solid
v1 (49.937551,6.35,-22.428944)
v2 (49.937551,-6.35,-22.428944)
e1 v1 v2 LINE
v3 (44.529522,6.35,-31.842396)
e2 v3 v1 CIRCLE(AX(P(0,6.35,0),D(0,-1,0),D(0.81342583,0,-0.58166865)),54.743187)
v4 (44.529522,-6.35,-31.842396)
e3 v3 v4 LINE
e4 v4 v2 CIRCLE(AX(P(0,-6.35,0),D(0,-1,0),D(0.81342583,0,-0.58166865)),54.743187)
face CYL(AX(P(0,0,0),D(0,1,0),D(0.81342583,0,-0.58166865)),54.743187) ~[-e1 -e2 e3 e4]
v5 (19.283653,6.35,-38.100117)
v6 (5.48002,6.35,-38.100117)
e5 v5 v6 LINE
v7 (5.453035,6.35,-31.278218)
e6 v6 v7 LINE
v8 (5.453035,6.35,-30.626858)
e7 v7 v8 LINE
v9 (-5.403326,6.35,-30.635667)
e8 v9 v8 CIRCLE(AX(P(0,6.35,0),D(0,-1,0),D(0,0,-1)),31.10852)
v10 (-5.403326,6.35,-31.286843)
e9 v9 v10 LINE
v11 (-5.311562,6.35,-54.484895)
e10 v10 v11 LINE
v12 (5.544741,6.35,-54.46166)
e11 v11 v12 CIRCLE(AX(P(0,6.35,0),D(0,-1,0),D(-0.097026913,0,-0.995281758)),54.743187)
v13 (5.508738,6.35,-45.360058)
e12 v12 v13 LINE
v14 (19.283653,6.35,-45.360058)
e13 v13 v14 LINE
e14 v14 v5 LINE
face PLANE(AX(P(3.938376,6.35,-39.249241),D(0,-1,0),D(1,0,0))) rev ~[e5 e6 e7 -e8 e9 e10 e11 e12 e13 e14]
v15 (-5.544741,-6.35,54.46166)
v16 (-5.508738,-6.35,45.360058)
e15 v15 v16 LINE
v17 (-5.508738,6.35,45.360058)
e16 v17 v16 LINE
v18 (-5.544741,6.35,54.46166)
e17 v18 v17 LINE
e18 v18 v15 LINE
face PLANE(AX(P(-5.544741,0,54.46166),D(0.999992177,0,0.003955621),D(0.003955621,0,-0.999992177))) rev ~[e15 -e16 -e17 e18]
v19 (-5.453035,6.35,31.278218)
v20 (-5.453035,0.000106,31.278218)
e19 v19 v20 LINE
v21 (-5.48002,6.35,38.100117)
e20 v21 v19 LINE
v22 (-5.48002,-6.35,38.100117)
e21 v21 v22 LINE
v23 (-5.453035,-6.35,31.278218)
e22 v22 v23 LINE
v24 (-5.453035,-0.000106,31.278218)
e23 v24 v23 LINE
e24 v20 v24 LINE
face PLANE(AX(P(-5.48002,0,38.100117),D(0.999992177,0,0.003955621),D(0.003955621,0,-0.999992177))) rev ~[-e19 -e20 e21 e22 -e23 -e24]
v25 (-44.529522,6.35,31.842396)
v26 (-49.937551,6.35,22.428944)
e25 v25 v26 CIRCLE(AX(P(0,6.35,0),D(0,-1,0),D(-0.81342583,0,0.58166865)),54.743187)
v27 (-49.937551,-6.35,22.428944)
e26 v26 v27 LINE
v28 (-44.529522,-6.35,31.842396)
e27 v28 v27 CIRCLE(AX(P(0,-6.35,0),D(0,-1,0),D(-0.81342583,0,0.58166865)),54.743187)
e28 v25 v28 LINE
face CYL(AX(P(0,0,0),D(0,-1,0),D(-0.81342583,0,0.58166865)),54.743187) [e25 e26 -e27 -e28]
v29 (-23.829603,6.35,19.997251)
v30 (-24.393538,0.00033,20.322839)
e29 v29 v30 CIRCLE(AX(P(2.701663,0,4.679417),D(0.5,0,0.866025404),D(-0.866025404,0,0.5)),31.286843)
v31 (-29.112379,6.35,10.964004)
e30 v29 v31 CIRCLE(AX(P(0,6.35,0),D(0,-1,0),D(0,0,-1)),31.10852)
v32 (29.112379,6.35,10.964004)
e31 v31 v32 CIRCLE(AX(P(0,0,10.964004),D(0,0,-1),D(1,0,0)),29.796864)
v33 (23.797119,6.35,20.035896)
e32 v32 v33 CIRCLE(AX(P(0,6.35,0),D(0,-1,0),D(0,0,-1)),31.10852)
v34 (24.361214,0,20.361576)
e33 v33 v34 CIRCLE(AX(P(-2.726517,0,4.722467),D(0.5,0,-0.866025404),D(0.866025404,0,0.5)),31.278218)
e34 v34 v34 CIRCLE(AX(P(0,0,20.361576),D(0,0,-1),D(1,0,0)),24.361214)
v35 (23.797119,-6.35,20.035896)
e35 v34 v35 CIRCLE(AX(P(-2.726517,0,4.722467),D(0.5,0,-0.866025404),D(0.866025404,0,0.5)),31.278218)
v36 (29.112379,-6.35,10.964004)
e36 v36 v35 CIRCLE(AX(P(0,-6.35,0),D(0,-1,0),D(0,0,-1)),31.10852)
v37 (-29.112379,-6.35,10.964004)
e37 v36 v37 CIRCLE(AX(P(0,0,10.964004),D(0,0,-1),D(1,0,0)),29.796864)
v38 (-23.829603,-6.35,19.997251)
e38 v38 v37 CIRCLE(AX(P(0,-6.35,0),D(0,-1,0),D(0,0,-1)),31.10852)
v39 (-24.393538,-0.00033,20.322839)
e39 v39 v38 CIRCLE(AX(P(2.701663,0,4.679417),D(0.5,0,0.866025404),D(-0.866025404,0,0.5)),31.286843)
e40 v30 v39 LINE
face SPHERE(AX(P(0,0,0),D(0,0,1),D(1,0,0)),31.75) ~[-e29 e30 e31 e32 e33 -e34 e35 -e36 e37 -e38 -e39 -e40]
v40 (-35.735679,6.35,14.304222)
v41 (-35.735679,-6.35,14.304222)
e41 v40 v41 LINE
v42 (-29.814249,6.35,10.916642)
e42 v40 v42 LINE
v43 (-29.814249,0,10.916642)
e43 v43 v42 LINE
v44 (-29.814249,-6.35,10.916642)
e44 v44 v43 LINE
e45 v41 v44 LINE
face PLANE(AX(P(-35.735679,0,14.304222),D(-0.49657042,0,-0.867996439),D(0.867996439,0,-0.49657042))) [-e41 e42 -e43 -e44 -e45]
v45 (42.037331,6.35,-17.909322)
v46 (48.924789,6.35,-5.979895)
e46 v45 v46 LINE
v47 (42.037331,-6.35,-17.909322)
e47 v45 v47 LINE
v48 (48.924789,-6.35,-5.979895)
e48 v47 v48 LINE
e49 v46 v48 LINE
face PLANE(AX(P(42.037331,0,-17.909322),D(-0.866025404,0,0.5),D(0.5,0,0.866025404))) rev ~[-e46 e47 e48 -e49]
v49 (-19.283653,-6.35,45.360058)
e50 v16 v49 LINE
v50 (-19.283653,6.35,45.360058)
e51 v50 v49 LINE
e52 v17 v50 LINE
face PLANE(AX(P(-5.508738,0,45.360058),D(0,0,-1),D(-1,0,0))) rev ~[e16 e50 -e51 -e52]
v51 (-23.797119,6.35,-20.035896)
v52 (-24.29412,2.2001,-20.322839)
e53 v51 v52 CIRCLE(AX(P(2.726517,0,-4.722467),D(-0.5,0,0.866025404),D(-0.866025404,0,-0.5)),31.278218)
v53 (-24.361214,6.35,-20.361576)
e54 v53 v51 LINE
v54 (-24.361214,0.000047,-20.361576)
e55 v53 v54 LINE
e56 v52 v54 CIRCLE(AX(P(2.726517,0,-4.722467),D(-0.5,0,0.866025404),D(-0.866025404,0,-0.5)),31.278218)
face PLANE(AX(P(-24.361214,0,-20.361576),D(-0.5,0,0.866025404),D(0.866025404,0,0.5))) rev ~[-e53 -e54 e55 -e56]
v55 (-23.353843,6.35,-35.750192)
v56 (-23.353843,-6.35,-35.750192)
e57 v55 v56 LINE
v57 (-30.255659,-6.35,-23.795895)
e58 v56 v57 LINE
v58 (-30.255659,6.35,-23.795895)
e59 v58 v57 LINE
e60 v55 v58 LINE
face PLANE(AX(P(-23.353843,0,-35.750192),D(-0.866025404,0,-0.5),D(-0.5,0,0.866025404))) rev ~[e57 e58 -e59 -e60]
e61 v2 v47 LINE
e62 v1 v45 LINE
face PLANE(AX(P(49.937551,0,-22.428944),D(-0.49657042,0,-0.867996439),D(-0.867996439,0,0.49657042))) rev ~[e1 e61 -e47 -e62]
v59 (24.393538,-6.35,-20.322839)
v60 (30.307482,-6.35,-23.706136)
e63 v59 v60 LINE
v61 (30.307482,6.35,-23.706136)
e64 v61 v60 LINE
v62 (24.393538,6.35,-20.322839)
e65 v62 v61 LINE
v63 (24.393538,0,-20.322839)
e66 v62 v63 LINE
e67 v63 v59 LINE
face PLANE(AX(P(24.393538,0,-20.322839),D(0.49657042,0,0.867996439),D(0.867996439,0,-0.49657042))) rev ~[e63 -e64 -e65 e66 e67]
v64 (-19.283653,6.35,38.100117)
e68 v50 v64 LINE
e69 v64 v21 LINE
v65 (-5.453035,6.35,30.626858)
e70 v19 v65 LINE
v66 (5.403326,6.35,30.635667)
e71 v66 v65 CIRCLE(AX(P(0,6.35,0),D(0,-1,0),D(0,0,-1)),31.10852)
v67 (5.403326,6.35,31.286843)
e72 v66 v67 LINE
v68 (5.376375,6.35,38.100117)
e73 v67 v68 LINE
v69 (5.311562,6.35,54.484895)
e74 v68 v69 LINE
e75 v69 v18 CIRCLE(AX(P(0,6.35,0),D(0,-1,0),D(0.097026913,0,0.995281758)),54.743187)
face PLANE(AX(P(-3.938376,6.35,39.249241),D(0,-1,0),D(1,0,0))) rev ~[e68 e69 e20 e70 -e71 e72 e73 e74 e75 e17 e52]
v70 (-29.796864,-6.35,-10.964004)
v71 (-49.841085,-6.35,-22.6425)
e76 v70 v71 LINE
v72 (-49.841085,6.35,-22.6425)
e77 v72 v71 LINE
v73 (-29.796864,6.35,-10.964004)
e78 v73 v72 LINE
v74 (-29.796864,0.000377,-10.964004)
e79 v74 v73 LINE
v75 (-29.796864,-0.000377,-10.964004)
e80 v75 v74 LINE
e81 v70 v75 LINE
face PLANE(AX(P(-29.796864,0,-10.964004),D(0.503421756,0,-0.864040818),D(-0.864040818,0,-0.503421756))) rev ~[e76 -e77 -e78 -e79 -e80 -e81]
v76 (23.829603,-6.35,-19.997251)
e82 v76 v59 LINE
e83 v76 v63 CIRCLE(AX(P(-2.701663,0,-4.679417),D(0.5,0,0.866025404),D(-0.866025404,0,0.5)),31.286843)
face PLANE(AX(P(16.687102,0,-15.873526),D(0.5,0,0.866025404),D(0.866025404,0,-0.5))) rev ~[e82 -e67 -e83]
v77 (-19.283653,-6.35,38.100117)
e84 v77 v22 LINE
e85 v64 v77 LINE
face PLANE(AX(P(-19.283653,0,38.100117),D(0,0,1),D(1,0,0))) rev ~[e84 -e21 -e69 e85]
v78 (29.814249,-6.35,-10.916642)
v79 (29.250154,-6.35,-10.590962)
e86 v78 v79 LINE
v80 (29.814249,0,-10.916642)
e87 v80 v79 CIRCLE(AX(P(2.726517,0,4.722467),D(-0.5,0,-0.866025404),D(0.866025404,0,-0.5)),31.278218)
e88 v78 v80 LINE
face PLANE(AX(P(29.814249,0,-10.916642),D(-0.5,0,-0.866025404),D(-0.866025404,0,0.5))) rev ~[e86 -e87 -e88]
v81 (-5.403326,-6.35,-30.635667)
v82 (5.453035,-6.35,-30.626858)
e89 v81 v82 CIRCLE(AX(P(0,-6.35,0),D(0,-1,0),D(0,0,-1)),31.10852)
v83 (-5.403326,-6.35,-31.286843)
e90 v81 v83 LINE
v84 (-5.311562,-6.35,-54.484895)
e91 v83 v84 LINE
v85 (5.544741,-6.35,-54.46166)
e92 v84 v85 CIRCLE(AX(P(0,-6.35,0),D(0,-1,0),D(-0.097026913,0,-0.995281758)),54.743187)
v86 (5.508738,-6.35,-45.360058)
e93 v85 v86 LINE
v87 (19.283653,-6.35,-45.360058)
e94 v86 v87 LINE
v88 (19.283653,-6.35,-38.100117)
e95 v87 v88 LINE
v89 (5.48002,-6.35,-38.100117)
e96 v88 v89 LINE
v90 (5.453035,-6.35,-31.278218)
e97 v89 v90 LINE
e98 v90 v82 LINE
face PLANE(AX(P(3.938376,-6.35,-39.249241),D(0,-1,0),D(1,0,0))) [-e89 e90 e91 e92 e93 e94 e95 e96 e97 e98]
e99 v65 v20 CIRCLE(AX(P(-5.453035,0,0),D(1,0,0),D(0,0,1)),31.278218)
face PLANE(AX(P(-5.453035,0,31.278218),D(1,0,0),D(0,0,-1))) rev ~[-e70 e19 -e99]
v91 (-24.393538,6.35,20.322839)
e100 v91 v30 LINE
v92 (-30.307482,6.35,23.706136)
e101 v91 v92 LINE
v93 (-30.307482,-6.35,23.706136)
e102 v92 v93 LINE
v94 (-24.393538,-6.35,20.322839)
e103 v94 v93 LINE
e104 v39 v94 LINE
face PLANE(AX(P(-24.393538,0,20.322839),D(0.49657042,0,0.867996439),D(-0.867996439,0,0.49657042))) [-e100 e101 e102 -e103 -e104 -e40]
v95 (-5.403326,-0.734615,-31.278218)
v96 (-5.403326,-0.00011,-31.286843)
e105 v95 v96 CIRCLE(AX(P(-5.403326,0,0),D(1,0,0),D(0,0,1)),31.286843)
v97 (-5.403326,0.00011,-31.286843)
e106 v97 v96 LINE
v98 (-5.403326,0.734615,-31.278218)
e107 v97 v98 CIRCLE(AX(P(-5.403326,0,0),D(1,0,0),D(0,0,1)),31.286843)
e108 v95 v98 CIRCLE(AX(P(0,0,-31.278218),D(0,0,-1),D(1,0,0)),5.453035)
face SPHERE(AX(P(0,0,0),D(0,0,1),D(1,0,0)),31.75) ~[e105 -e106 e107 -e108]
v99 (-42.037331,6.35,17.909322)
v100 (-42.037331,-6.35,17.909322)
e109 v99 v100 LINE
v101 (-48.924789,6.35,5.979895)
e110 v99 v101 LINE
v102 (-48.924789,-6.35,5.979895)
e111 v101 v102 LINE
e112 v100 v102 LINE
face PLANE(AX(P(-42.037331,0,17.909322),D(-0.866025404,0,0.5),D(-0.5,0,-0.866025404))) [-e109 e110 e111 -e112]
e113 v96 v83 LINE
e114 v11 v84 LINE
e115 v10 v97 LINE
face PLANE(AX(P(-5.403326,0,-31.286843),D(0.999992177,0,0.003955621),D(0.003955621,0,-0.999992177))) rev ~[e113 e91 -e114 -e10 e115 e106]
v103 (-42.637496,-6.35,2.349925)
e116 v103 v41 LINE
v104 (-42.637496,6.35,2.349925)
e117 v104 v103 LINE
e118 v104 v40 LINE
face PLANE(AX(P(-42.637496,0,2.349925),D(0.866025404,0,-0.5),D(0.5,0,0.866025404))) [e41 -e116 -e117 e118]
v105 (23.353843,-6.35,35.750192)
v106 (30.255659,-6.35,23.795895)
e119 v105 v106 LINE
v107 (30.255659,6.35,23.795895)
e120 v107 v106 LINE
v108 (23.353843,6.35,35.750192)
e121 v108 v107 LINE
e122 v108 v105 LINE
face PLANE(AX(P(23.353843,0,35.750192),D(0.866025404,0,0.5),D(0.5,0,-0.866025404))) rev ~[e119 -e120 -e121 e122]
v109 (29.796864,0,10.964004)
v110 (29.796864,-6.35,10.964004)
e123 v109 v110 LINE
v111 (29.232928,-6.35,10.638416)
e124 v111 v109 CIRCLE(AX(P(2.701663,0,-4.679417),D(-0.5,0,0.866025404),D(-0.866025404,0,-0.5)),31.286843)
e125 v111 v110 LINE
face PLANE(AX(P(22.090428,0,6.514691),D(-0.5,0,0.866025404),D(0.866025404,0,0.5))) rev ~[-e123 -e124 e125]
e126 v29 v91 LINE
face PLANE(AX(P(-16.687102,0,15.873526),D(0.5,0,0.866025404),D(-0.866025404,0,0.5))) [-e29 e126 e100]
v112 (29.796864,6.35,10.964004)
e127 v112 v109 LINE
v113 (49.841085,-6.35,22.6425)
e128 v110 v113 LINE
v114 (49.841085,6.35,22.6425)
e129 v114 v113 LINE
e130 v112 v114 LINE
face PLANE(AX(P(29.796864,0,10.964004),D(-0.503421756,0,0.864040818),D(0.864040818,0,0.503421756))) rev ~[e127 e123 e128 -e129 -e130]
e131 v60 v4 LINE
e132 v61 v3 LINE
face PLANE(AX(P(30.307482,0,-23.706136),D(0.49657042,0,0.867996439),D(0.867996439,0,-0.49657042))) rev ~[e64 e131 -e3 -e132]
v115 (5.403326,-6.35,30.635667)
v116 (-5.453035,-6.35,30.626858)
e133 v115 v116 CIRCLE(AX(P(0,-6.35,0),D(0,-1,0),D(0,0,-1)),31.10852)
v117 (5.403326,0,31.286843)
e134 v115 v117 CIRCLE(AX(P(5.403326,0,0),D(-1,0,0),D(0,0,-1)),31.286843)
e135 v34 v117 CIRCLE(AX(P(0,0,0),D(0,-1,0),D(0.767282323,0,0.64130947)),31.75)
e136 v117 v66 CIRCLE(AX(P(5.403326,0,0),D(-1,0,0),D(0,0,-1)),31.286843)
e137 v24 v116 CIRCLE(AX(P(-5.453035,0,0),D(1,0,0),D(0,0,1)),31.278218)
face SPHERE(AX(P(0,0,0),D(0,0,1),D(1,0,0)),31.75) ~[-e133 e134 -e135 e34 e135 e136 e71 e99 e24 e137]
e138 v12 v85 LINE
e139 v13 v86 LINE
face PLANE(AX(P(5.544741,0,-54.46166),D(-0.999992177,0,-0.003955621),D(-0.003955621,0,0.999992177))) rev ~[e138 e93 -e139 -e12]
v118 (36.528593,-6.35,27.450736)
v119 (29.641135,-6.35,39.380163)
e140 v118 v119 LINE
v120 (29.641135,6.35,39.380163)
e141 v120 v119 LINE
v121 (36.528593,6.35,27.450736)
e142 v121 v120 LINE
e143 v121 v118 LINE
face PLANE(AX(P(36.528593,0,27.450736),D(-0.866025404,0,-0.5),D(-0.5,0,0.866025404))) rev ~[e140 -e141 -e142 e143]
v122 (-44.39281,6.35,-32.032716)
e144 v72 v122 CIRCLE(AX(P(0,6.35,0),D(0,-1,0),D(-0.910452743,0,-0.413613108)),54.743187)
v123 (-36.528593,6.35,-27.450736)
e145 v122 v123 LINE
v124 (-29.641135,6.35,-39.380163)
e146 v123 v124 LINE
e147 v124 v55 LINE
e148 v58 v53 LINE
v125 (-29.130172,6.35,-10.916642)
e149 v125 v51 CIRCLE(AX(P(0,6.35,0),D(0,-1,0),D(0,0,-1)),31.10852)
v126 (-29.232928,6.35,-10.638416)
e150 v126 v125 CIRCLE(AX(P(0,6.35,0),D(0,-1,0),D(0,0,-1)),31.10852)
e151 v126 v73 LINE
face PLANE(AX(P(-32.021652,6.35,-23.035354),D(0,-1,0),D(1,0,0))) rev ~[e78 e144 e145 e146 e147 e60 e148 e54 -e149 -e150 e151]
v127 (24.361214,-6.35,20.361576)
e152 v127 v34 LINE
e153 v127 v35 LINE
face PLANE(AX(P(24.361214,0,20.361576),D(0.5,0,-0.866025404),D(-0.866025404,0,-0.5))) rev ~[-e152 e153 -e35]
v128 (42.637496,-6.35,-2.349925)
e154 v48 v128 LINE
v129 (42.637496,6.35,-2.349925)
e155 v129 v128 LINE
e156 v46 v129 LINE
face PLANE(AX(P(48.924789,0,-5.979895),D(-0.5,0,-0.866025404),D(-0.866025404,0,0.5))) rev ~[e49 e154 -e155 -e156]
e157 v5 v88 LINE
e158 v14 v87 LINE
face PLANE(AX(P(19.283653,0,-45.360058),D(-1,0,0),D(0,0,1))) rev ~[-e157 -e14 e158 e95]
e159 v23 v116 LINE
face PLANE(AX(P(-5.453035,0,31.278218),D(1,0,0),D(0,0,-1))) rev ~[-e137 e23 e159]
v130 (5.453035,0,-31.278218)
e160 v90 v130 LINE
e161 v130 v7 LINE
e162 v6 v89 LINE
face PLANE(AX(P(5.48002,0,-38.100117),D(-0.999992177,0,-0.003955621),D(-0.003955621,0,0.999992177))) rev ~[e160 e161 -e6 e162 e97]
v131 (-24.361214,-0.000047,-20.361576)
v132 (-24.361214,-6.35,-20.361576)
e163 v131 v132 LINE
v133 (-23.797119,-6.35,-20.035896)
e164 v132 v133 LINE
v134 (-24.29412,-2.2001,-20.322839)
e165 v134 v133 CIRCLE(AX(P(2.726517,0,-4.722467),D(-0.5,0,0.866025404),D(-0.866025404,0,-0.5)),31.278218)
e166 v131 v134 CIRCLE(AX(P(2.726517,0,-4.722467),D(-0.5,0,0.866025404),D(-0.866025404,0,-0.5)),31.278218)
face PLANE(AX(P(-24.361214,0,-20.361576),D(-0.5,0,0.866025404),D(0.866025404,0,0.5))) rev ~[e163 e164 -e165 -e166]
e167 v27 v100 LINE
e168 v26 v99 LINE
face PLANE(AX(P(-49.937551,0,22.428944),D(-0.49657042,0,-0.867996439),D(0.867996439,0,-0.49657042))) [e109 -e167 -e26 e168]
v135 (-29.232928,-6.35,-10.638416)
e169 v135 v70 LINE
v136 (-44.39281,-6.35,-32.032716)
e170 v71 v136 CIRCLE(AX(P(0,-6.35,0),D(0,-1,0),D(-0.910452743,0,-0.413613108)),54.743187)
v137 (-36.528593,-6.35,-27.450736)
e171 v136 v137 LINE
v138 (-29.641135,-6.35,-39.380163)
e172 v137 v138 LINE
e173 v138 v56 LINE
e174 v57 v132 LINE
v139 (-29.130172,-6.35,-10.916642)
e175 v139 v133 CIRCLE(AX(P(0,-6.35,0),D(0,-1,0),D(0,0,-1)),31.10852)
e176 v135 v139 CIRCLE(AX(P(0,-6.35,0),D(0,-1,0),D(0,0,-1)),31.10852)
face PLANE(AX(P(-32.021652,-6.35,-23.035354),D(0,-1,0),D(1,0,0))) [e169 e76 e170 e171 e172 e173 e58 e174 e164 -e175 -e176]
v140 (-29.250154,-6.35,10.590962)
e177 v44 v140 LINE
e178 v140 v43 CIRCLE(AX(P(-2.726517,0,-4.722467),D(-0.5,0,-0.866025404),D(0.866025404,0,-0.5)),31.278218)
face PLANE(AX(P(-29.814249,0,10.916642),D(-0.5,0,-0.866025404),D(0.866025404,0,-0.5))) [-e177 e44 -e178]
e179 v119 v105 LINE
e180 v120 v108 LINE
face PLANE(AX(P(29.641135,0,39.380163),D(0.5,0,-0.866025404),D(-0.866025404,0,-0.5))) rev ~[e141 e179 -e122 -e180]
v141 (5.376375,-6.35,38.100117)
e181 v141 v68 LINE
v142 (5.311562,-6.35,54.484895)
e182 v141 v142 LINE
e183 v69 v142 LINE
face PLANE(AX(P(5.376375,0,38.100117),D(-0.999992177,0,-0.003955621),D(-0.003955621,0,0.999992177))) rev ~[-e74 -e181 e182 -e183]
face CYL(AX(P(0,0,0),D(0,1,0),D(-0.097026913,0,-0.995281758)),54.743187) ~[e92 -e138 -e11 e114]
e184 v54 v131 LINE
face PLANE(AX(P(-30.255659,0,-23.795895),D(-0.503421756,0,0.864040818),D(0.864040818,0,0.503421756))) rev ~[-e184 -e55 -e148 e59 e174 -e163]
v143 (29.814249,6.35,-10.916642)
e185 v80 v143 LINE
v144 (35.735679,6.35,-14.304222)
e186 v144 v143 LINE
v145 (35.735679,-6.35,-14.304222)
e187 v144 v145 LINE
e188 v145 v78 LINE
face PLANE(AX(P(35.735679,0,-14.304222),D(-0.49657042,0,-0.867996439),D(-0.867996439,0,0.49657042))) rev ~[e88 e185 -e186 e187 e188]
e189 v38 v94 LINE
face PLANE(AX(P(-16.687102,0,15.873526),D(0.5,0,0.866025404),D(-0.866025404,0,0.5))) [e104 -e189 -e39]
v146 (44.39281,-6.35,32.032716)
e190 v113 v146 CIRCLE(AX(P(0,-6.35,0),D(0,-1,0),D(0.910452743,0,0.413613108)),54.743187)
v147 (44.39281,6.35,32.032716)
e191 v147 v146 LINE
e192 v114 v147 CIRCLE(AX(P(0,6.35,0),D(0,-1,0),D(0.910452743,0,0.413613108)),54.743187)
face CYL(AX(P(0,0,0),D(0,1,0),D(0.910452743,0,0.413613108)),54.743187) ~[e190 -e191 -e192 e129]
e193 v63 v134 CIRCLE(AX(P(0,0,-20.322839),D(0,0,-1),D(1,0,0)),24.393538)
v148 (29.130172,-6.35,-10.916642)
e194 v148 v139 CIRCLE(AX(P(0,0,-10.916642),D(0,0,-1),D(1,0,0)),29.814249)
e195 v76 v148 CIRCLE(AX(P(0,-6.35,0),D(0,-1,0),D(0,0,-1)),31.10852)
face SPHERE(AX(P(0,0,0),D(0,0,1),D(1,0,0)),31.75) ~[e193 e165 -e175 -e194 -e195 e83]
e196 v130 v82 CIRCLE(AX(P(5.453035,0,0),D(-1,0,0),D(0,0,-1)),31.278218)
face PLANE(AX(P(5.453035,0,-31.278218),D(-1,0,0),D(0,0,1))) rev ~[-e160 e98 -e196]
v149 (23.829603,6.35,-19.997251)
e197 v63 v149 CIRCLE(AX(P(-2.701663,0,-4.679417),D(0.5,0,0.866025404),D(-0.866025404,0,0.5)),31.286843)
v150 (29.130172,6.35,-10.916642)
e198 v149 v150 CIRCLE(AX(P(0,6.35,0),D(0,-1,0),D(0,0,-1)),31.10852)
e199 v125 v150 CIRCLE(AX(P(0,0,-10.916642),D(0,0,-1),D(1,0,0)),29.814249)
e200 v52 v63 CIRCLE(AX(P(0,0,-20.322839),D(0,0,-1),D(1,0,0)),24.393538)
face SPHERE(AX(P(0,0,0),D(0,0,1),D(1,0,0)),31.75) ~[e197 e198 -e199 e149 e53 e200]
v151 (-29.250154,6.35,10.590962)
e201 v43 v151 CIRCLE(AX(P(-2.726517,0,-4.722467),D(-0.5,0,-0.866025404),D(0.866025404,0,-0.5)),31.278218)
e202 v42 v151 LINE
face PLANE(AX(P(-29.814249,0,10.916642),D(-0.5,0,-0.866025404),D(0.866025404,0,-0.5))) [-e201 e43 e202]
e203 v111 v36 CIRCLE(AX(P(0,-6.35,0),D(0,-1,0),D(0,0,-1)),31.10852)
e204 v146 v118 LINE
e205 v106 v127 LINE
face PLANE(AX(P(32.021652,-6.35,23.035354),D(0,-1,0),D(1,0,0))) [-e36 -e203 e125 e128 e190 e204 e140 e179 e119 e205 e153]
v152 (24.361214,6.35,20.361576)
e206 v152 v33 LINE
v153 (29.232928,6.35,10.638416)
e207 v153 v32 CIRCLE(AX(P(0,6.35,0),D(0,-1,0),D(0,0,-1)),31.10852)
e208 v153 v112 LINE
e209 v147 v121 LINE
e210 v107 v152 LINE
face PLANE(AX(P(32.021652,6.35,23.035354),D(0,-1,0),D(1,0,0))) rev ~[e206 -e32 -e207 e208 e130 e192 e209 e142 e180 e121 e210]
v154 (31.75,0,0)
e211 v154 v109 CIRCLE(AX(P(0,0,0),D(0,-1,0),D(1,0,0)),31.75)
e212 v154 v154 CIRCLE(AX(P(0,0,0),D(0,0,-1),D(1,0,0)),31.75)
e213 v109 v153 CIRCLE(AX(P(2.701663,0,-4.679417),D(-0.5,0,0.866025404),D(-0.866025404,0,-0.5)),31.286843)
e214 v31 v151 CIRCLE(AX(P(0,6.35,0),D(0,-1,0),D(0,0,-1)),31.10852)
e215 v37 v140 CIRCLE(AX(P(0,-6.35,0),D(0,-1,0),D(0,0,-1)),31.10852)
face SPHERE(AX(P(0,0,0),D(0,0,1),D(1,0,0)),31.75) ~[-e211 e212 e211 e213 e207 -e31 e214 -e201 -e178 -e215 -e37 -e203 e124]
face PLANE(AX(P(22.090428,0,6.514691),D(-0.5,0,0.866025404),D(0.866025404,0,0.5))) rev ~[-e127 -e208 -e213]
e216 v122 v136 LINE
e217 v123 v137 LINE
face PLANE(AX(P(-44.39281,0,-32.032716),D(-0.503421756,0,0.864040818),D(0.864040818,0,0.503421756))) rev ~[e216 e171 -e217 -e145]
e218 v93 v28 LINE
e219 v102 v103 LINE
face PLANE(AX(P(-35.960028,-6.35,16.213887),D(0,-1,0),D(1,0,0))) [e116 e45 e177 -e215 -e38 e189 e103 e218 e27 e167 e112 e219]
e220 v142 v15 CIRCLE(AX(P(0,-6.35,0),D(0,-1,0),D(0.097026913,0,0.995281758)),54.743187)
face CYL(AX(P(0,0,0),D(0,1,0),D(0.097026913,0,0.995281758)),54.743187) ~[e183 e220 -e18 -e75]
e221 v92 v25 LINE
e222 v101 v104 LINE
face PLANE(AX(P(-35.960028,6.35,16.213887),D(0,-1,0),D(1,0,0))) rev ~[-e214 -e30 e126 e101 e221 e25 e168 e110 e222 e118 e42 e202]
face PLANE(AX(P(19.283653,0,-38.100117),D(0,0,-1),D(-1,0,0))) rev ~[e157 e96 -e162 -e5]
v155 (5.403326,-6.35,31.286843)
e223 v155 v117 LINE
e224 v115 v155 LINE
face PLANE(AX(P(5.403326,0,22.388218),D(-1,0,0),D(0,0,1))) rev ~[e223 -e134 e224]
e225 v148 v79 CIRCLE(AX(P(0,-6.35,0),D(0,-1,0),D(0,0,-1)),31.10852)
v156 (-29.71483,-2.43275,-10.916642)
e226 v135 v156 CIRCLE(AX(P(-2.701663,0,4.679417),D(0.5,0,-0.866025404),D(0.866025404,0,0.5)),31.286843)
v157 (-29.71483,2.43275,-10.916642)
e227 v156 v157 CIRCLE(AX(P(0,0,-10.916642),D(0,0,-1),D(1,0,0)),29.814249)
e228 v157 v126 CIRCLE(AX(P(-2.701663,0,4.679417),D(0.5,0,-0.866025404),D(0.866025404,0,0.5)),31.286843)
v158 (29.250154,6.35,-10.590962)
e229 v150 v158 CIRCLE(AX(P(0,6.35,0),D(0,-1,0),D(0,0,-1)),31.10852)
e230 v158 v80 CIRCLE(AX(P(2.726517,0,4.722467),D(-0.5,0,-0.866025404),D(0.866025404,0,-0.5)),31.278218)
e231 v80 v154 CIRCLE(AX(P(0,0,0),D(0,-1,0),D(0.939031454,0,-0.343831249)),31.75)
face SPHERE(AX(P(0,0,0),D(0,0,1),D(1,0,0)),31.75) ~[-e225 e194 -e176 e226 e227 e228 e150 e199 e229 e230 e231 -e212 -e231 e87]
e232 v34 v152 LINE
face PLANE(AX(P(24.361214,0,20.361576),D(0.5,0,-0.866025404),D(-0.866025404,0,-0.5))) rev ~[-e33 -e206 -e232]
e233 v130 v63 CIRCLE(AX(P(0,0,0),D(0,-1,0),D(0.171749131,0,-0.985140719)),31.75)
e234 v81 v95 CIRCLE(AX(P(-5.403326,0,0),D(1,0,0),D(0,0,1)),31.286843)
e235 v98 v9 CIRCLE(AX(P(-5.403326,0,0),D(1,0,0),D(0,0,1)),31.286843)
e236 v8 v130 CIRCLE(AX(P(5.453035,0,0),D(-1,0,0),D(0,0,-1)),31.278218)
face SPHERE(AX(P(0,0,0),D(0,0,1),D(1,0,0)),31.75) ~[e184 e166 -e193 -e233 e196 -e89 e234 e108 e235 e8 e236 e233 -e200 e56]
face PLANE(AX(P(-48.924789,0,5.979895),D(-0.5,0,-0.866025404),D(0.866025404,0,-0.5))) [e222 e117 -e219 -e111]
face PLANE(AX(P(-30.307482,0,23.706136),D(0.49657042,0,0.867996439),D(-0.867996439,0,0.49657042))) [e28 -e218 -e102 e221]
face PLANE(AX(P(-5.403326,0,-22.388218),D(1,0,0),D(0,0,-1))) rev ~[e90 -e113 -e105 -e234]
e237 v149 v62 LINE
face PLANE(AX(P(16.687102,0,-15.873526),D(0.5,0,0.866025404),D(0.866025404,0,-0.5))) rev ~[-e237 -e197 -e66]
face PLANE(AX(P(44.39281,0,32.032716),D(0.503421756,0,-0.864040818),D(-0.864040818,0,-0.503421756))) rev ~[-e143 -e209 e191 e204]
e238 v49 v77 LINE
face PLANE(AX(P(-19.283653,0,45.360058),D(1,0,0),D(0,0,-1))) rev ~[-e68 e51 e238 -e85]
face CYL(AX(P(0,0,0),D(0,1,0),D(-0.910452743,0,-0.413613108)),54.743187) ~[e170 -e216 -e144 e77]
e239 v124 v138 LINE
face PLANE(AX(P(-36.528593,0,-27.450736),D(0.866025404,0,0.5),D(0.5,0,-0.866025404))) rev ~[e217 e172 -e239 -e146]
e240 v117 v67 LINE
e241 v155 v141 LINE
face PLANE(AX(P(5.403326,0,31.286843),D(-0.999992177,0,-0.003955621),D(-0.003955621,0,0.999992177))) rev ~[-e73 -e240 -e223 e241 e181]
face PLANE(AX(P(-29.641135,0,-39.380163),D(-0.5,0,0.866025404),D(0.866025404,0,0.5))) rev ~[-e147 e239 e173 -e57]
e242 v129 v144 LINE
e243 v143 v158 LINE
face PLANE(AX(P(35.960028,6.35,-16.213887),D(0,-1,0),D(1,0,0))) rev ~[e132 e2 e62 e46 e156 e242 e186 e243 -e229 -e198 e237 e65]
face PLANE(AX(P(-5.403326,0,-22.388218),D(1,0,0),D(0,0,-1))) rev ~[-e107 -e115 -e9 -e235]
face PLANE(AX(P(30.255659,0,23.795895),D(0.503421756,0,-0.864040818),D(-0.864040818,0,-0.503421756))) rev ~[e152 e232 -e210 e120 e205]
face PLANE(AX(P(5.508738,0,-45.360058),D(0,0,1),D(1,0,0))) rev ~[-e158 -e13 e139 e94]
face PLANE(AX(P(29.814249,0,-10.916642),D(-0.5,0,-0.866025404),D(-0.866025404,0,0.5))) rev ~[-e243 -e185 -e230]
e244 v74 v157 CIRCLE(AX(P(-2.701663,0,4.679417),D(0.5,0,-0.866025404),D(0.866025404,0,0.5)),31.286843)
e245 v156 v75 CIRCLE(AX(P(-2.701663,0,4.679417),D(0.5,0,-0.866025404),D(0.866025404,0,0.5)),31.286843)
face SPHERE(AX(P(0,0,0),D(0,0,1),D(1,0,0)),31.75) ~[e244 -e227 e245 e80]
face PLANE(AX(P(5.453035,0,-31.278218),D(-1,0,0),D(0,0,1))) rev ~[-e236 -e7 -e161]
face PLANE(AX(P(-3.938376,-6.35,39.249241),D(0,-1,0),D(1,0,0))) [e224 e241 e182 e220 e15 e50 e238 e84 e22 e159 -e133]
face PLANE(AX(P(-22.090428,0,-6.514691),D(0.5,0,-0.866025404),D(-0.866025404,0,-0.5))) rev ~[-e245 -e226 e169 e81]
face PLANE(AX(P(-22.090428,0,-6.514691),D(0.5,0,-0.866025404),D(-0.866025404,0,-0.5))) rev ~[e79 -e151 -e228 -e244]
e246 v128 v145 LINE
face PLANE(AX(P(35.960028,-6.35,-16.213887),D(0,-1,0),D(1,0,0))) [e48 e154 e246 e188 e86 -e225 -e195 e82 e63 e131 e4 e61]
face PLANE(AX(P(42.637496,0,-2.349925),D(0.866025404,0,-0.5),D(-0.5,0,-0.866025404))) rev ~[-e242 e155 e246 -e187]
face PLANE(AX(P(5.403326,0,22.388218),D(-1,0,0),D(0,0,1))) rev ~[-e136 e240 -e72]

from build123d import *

# Parameters (mm, degrees)
F4_DEPTH = 6.35


# Not quite as in the source:
# - the program builds the solid bodies; features that only make, move or delete a surface that nothing else refers to are left out


with BuildPart() as f2:
    # F0 (on Front) → F2 (revolve)
    with BuildSketch(Plane.XZ):
        with BuildLine():
            ThreePointArc((24.3612137616, 20.3615756773), (15.8531486732, 27.508910868), (5.403325821, 31.2868434022))
            ThreePointArc((5.403325821, 31.2868434022), (2.7115698388, 31.6339989412), (0, 31.75))
            Line((0, 31.75), (0, -31.75))
            ThreePointArc((0, -31.75), (2.736702771, -31.6318345649), (5.4530349168, -31.2782178232))
            ThreePointArc((5.4530349168, -31.2782178232), (15.8968413055, -27.483684915), (24.39353828, -20.322839127))
            ThreePointArc((24.39353828, -20.322839127), (27.508910868, -15.8531486732), (29.8142486784, -10.9166421459))
            ThreePointArc((29.8142486784, -10.9166421459), (31.2623167371, -5.5434693316), (31.75, 0))
            ThreePointArc((31.75, 0), (31.2579024825, 5.5683060617), (29.796864101, 10.9640042752))
            ThreePointArc((29.796864101, 10.9640042752), (27.483684915, 15.8968413055), (24.3612137616, 20.3615756773))
        make_face()
    revolve(axis=Axis((0, 0, 0), (0, 0, -1)))

    # F3 (on Front) → F4 (join, symmetric)
    with BuildSketch(Plane.XZ):
        with BuildLine():
            Line((5.376374884, 38.1001170391), (5.3115624093, 54.484895228))
            ThreePointArc((5.3115624093, 54.484895228), (-0.1171664817, 54.7430614347), (-5.5447405359, 54.4616595011))
            Line((-5.5447405359, 54.4616595011), (-5.5087377694, 45.3600575994))
            Line((-5.5087377694, 45.3600575994), (-19.2836534145, 45.3600575994))
            Line((-19.2836534145, 45.3600575994), (-19.2836534145, 38.1001170391))
            Line((-19.2836534145, 38.1001170391), (-5.4800199737, 38.1001170391))
            Line((-5.4800199737, 38.1001170391), (-5.4530349168, 31.2782178232))
            Line((-5.4530349168, 31.2782178232), (-5.4530349168, 22.3882178232))
            Line((-5.4530349168, 22.3882178232), (5.403325821, 22.3882178232))
            Line((5.403325821, 22.3882178232), (5.403325821, 31.2868434022))
            Line((5.403325821, 31.2868434022), (5.376374884, 38.1001170391))
        make_face()
        with BuildLine():
            Line((22.0904282909, 6.5146914857), (29.796864101, 10.9640042752))
            Line((29.796864101, 10.9640042752), (49.8410845946, 22.6424996338))
            ThreePointArc((49.8410845946, 22.6424996338), (47.3502986425, 27.472999867), (44.3928103923, 32.0327159121))
            Line((44.3928103923, 32.0327159121), (36.5285933135, 27.4507356508))
            Line((36.5285933135, 27.4507356508), (29.6411354909, 39.3801625345))
            Line((29.6411354909, 39.3801625345), (23.3538425357, 35.7501922543))
            Line((23.3538425357, 35.7501922543), (30.2556592562, 23.79589503))
            Line((30.2556592562, 23.79589503), (24.3612137616, 20.3615756773))
            Line((24.3612137616, 20.3615756773), (16.6622479219, 15.9165756773))
            Line((16.6622479219, 15.9165756773), (22.0904282909, 6.5146914857))
        make_face()
        with BuildLine():
            Line((16.6871024699, -15.8735263375), (24.39353828, -20.322839127))
            Line((24.39353828, -20.322839127), (30.307481801, -23.7061357493))
            Line((30.307481801, -23.7061357493), (44.5295221853, -31.8423955942))
            ThreePointArc((44.5295221853, -31.8423955942), (47.4674651242, -27.2700615677), (49.9375509282, -22.4289435891))
            Line((49.9375509282, -22.4289435891), (42.0373310829, -17.9093219486))
            Line((42.0373310829, -17.9093219486), (48.9247889055, -5.9798950649))
            Line((48.9247889055, -5.9798950649), (42.6374959503, -2.3499247848))
            Line((42.6374959503, -2.3499247848), (35.7356792298, -14.3042220091))
            Line((35.7356792298, -14.3042220091), (29.8142486784, -10.9166421459))
            Line((29.8142486784, -10.9166421459), (22.1152828388, -6.4716421459))
            Line((22.1152828388, -6.4716421459), (16.6871024699, -15.8735263375))
        make_face()
        with BuildLine():
            Line((-5.403325821, -22.3882178232), (-5.403325821, -31.2868434022))
            Line((-5.403325821, -31.2868434022), (-5.3115624093, -54.484895228))
            ThreePointArc((-5.3115624093, -54.484895228), (0.1171664817, -54.7430614347), (5.5447405359, -54.4616595011))
            Line((5.5447405359, -54.4616595011), (5.5087377694, -45.3600575994))
            Line((5.5087377694, -45.3600575994), (19.2836534145, -45.3600575994))
            Line((19.2836534145, -45.3600575994), (19.2836534145, -38.1001170391))
            Line((19.2836534145, -38.1001170391), (5.4800199737, -38.1001170391))
            Line((5.4800199737, -38.1001170391), (5.4530349168, -31.2782178232))
            Line((5.4530349168, -31.2782178232), (5.4530349168, -22.3882178232))
            Line((5.4530349168, -22.3882178232), (-5.403325821, -22.3882178232))
        make_face()
        with BuildLine():
            Line((-29.796864101, -10.9640042752), (-49.8410845946, -22.6424996338))
            ThreePointArc((-49.8410845946, -22.6424996338), (-47.3502986425, -27.472999867), (-44.3928103923, -32.0327159121))
            Line((-44.3928103923, -32.0327159121), (-36.5285933135, -27.4507356508))
            Line((-36.5285933135, -27.4507356508), (-29.6411354909, -39.3801625345))
            Line((-29.6411354909, -39.3801625345), (-23.3538425357, -35.7501922543))
            Line((-23.3538425357, -35.7501922543), (-30.2556592562, -23.79589503))
            Line((-30.2556592562, -23.79589503), (-24.3612137616, -20.3615756773))
            Line((-24.3612137616, -20.3615756773), (-16.6622479219, -15.9165756773))
            Line((-16.6622479219, -15.9165756773), (-22.0904282909, -6.5146914857))
            Line((-22.0904282909, -6.5146914857), (-29.796864101, -10.9640042752))
        make_face()
        with BuildLine():
            Line((-16.6871024699, 15.8735263375), (-24.39353828, 20.322839127))
            Line((-24.39353828, 20.322839127), (-30.307481801, 23.7061357493))
            Line((-30.307481801, 23.7061357493), (-44.5295221853, 31.8423955942))
            ThreePointArc((-44.5295221853, 31.8423955942), (-47.4674651242, 27.2700615677), (-49.9375509282, 22.4289435891))
            Line((-49.9375509282, 22.4289435891), (-42.0373310829, 17.9093219486))
            Line((-42.0373310829, 17.9093219486), (-48.9247889055, 5.9798950649))
            Line((-48.9247889055, 5.9798950649), (-42.6374959503, 2.3499247848))
            Line((-42.6374959503, 2.3499247848), (-35.7356792298, 14.3042220091))
            Line((-35.7356792298, 14.3042220091), (-29.8142486784, 10.9166421459))
            Line((-29.8142486784, 10.9166421459), (-22.1152828388, 6.4716421459))
            Line((-22.1152828388, 6.4716421459), (-16.6871024699, 15.8735263375))
        make_face()
    extrude(amount=F4_DEPTH, both=True)


solid = f2.part
